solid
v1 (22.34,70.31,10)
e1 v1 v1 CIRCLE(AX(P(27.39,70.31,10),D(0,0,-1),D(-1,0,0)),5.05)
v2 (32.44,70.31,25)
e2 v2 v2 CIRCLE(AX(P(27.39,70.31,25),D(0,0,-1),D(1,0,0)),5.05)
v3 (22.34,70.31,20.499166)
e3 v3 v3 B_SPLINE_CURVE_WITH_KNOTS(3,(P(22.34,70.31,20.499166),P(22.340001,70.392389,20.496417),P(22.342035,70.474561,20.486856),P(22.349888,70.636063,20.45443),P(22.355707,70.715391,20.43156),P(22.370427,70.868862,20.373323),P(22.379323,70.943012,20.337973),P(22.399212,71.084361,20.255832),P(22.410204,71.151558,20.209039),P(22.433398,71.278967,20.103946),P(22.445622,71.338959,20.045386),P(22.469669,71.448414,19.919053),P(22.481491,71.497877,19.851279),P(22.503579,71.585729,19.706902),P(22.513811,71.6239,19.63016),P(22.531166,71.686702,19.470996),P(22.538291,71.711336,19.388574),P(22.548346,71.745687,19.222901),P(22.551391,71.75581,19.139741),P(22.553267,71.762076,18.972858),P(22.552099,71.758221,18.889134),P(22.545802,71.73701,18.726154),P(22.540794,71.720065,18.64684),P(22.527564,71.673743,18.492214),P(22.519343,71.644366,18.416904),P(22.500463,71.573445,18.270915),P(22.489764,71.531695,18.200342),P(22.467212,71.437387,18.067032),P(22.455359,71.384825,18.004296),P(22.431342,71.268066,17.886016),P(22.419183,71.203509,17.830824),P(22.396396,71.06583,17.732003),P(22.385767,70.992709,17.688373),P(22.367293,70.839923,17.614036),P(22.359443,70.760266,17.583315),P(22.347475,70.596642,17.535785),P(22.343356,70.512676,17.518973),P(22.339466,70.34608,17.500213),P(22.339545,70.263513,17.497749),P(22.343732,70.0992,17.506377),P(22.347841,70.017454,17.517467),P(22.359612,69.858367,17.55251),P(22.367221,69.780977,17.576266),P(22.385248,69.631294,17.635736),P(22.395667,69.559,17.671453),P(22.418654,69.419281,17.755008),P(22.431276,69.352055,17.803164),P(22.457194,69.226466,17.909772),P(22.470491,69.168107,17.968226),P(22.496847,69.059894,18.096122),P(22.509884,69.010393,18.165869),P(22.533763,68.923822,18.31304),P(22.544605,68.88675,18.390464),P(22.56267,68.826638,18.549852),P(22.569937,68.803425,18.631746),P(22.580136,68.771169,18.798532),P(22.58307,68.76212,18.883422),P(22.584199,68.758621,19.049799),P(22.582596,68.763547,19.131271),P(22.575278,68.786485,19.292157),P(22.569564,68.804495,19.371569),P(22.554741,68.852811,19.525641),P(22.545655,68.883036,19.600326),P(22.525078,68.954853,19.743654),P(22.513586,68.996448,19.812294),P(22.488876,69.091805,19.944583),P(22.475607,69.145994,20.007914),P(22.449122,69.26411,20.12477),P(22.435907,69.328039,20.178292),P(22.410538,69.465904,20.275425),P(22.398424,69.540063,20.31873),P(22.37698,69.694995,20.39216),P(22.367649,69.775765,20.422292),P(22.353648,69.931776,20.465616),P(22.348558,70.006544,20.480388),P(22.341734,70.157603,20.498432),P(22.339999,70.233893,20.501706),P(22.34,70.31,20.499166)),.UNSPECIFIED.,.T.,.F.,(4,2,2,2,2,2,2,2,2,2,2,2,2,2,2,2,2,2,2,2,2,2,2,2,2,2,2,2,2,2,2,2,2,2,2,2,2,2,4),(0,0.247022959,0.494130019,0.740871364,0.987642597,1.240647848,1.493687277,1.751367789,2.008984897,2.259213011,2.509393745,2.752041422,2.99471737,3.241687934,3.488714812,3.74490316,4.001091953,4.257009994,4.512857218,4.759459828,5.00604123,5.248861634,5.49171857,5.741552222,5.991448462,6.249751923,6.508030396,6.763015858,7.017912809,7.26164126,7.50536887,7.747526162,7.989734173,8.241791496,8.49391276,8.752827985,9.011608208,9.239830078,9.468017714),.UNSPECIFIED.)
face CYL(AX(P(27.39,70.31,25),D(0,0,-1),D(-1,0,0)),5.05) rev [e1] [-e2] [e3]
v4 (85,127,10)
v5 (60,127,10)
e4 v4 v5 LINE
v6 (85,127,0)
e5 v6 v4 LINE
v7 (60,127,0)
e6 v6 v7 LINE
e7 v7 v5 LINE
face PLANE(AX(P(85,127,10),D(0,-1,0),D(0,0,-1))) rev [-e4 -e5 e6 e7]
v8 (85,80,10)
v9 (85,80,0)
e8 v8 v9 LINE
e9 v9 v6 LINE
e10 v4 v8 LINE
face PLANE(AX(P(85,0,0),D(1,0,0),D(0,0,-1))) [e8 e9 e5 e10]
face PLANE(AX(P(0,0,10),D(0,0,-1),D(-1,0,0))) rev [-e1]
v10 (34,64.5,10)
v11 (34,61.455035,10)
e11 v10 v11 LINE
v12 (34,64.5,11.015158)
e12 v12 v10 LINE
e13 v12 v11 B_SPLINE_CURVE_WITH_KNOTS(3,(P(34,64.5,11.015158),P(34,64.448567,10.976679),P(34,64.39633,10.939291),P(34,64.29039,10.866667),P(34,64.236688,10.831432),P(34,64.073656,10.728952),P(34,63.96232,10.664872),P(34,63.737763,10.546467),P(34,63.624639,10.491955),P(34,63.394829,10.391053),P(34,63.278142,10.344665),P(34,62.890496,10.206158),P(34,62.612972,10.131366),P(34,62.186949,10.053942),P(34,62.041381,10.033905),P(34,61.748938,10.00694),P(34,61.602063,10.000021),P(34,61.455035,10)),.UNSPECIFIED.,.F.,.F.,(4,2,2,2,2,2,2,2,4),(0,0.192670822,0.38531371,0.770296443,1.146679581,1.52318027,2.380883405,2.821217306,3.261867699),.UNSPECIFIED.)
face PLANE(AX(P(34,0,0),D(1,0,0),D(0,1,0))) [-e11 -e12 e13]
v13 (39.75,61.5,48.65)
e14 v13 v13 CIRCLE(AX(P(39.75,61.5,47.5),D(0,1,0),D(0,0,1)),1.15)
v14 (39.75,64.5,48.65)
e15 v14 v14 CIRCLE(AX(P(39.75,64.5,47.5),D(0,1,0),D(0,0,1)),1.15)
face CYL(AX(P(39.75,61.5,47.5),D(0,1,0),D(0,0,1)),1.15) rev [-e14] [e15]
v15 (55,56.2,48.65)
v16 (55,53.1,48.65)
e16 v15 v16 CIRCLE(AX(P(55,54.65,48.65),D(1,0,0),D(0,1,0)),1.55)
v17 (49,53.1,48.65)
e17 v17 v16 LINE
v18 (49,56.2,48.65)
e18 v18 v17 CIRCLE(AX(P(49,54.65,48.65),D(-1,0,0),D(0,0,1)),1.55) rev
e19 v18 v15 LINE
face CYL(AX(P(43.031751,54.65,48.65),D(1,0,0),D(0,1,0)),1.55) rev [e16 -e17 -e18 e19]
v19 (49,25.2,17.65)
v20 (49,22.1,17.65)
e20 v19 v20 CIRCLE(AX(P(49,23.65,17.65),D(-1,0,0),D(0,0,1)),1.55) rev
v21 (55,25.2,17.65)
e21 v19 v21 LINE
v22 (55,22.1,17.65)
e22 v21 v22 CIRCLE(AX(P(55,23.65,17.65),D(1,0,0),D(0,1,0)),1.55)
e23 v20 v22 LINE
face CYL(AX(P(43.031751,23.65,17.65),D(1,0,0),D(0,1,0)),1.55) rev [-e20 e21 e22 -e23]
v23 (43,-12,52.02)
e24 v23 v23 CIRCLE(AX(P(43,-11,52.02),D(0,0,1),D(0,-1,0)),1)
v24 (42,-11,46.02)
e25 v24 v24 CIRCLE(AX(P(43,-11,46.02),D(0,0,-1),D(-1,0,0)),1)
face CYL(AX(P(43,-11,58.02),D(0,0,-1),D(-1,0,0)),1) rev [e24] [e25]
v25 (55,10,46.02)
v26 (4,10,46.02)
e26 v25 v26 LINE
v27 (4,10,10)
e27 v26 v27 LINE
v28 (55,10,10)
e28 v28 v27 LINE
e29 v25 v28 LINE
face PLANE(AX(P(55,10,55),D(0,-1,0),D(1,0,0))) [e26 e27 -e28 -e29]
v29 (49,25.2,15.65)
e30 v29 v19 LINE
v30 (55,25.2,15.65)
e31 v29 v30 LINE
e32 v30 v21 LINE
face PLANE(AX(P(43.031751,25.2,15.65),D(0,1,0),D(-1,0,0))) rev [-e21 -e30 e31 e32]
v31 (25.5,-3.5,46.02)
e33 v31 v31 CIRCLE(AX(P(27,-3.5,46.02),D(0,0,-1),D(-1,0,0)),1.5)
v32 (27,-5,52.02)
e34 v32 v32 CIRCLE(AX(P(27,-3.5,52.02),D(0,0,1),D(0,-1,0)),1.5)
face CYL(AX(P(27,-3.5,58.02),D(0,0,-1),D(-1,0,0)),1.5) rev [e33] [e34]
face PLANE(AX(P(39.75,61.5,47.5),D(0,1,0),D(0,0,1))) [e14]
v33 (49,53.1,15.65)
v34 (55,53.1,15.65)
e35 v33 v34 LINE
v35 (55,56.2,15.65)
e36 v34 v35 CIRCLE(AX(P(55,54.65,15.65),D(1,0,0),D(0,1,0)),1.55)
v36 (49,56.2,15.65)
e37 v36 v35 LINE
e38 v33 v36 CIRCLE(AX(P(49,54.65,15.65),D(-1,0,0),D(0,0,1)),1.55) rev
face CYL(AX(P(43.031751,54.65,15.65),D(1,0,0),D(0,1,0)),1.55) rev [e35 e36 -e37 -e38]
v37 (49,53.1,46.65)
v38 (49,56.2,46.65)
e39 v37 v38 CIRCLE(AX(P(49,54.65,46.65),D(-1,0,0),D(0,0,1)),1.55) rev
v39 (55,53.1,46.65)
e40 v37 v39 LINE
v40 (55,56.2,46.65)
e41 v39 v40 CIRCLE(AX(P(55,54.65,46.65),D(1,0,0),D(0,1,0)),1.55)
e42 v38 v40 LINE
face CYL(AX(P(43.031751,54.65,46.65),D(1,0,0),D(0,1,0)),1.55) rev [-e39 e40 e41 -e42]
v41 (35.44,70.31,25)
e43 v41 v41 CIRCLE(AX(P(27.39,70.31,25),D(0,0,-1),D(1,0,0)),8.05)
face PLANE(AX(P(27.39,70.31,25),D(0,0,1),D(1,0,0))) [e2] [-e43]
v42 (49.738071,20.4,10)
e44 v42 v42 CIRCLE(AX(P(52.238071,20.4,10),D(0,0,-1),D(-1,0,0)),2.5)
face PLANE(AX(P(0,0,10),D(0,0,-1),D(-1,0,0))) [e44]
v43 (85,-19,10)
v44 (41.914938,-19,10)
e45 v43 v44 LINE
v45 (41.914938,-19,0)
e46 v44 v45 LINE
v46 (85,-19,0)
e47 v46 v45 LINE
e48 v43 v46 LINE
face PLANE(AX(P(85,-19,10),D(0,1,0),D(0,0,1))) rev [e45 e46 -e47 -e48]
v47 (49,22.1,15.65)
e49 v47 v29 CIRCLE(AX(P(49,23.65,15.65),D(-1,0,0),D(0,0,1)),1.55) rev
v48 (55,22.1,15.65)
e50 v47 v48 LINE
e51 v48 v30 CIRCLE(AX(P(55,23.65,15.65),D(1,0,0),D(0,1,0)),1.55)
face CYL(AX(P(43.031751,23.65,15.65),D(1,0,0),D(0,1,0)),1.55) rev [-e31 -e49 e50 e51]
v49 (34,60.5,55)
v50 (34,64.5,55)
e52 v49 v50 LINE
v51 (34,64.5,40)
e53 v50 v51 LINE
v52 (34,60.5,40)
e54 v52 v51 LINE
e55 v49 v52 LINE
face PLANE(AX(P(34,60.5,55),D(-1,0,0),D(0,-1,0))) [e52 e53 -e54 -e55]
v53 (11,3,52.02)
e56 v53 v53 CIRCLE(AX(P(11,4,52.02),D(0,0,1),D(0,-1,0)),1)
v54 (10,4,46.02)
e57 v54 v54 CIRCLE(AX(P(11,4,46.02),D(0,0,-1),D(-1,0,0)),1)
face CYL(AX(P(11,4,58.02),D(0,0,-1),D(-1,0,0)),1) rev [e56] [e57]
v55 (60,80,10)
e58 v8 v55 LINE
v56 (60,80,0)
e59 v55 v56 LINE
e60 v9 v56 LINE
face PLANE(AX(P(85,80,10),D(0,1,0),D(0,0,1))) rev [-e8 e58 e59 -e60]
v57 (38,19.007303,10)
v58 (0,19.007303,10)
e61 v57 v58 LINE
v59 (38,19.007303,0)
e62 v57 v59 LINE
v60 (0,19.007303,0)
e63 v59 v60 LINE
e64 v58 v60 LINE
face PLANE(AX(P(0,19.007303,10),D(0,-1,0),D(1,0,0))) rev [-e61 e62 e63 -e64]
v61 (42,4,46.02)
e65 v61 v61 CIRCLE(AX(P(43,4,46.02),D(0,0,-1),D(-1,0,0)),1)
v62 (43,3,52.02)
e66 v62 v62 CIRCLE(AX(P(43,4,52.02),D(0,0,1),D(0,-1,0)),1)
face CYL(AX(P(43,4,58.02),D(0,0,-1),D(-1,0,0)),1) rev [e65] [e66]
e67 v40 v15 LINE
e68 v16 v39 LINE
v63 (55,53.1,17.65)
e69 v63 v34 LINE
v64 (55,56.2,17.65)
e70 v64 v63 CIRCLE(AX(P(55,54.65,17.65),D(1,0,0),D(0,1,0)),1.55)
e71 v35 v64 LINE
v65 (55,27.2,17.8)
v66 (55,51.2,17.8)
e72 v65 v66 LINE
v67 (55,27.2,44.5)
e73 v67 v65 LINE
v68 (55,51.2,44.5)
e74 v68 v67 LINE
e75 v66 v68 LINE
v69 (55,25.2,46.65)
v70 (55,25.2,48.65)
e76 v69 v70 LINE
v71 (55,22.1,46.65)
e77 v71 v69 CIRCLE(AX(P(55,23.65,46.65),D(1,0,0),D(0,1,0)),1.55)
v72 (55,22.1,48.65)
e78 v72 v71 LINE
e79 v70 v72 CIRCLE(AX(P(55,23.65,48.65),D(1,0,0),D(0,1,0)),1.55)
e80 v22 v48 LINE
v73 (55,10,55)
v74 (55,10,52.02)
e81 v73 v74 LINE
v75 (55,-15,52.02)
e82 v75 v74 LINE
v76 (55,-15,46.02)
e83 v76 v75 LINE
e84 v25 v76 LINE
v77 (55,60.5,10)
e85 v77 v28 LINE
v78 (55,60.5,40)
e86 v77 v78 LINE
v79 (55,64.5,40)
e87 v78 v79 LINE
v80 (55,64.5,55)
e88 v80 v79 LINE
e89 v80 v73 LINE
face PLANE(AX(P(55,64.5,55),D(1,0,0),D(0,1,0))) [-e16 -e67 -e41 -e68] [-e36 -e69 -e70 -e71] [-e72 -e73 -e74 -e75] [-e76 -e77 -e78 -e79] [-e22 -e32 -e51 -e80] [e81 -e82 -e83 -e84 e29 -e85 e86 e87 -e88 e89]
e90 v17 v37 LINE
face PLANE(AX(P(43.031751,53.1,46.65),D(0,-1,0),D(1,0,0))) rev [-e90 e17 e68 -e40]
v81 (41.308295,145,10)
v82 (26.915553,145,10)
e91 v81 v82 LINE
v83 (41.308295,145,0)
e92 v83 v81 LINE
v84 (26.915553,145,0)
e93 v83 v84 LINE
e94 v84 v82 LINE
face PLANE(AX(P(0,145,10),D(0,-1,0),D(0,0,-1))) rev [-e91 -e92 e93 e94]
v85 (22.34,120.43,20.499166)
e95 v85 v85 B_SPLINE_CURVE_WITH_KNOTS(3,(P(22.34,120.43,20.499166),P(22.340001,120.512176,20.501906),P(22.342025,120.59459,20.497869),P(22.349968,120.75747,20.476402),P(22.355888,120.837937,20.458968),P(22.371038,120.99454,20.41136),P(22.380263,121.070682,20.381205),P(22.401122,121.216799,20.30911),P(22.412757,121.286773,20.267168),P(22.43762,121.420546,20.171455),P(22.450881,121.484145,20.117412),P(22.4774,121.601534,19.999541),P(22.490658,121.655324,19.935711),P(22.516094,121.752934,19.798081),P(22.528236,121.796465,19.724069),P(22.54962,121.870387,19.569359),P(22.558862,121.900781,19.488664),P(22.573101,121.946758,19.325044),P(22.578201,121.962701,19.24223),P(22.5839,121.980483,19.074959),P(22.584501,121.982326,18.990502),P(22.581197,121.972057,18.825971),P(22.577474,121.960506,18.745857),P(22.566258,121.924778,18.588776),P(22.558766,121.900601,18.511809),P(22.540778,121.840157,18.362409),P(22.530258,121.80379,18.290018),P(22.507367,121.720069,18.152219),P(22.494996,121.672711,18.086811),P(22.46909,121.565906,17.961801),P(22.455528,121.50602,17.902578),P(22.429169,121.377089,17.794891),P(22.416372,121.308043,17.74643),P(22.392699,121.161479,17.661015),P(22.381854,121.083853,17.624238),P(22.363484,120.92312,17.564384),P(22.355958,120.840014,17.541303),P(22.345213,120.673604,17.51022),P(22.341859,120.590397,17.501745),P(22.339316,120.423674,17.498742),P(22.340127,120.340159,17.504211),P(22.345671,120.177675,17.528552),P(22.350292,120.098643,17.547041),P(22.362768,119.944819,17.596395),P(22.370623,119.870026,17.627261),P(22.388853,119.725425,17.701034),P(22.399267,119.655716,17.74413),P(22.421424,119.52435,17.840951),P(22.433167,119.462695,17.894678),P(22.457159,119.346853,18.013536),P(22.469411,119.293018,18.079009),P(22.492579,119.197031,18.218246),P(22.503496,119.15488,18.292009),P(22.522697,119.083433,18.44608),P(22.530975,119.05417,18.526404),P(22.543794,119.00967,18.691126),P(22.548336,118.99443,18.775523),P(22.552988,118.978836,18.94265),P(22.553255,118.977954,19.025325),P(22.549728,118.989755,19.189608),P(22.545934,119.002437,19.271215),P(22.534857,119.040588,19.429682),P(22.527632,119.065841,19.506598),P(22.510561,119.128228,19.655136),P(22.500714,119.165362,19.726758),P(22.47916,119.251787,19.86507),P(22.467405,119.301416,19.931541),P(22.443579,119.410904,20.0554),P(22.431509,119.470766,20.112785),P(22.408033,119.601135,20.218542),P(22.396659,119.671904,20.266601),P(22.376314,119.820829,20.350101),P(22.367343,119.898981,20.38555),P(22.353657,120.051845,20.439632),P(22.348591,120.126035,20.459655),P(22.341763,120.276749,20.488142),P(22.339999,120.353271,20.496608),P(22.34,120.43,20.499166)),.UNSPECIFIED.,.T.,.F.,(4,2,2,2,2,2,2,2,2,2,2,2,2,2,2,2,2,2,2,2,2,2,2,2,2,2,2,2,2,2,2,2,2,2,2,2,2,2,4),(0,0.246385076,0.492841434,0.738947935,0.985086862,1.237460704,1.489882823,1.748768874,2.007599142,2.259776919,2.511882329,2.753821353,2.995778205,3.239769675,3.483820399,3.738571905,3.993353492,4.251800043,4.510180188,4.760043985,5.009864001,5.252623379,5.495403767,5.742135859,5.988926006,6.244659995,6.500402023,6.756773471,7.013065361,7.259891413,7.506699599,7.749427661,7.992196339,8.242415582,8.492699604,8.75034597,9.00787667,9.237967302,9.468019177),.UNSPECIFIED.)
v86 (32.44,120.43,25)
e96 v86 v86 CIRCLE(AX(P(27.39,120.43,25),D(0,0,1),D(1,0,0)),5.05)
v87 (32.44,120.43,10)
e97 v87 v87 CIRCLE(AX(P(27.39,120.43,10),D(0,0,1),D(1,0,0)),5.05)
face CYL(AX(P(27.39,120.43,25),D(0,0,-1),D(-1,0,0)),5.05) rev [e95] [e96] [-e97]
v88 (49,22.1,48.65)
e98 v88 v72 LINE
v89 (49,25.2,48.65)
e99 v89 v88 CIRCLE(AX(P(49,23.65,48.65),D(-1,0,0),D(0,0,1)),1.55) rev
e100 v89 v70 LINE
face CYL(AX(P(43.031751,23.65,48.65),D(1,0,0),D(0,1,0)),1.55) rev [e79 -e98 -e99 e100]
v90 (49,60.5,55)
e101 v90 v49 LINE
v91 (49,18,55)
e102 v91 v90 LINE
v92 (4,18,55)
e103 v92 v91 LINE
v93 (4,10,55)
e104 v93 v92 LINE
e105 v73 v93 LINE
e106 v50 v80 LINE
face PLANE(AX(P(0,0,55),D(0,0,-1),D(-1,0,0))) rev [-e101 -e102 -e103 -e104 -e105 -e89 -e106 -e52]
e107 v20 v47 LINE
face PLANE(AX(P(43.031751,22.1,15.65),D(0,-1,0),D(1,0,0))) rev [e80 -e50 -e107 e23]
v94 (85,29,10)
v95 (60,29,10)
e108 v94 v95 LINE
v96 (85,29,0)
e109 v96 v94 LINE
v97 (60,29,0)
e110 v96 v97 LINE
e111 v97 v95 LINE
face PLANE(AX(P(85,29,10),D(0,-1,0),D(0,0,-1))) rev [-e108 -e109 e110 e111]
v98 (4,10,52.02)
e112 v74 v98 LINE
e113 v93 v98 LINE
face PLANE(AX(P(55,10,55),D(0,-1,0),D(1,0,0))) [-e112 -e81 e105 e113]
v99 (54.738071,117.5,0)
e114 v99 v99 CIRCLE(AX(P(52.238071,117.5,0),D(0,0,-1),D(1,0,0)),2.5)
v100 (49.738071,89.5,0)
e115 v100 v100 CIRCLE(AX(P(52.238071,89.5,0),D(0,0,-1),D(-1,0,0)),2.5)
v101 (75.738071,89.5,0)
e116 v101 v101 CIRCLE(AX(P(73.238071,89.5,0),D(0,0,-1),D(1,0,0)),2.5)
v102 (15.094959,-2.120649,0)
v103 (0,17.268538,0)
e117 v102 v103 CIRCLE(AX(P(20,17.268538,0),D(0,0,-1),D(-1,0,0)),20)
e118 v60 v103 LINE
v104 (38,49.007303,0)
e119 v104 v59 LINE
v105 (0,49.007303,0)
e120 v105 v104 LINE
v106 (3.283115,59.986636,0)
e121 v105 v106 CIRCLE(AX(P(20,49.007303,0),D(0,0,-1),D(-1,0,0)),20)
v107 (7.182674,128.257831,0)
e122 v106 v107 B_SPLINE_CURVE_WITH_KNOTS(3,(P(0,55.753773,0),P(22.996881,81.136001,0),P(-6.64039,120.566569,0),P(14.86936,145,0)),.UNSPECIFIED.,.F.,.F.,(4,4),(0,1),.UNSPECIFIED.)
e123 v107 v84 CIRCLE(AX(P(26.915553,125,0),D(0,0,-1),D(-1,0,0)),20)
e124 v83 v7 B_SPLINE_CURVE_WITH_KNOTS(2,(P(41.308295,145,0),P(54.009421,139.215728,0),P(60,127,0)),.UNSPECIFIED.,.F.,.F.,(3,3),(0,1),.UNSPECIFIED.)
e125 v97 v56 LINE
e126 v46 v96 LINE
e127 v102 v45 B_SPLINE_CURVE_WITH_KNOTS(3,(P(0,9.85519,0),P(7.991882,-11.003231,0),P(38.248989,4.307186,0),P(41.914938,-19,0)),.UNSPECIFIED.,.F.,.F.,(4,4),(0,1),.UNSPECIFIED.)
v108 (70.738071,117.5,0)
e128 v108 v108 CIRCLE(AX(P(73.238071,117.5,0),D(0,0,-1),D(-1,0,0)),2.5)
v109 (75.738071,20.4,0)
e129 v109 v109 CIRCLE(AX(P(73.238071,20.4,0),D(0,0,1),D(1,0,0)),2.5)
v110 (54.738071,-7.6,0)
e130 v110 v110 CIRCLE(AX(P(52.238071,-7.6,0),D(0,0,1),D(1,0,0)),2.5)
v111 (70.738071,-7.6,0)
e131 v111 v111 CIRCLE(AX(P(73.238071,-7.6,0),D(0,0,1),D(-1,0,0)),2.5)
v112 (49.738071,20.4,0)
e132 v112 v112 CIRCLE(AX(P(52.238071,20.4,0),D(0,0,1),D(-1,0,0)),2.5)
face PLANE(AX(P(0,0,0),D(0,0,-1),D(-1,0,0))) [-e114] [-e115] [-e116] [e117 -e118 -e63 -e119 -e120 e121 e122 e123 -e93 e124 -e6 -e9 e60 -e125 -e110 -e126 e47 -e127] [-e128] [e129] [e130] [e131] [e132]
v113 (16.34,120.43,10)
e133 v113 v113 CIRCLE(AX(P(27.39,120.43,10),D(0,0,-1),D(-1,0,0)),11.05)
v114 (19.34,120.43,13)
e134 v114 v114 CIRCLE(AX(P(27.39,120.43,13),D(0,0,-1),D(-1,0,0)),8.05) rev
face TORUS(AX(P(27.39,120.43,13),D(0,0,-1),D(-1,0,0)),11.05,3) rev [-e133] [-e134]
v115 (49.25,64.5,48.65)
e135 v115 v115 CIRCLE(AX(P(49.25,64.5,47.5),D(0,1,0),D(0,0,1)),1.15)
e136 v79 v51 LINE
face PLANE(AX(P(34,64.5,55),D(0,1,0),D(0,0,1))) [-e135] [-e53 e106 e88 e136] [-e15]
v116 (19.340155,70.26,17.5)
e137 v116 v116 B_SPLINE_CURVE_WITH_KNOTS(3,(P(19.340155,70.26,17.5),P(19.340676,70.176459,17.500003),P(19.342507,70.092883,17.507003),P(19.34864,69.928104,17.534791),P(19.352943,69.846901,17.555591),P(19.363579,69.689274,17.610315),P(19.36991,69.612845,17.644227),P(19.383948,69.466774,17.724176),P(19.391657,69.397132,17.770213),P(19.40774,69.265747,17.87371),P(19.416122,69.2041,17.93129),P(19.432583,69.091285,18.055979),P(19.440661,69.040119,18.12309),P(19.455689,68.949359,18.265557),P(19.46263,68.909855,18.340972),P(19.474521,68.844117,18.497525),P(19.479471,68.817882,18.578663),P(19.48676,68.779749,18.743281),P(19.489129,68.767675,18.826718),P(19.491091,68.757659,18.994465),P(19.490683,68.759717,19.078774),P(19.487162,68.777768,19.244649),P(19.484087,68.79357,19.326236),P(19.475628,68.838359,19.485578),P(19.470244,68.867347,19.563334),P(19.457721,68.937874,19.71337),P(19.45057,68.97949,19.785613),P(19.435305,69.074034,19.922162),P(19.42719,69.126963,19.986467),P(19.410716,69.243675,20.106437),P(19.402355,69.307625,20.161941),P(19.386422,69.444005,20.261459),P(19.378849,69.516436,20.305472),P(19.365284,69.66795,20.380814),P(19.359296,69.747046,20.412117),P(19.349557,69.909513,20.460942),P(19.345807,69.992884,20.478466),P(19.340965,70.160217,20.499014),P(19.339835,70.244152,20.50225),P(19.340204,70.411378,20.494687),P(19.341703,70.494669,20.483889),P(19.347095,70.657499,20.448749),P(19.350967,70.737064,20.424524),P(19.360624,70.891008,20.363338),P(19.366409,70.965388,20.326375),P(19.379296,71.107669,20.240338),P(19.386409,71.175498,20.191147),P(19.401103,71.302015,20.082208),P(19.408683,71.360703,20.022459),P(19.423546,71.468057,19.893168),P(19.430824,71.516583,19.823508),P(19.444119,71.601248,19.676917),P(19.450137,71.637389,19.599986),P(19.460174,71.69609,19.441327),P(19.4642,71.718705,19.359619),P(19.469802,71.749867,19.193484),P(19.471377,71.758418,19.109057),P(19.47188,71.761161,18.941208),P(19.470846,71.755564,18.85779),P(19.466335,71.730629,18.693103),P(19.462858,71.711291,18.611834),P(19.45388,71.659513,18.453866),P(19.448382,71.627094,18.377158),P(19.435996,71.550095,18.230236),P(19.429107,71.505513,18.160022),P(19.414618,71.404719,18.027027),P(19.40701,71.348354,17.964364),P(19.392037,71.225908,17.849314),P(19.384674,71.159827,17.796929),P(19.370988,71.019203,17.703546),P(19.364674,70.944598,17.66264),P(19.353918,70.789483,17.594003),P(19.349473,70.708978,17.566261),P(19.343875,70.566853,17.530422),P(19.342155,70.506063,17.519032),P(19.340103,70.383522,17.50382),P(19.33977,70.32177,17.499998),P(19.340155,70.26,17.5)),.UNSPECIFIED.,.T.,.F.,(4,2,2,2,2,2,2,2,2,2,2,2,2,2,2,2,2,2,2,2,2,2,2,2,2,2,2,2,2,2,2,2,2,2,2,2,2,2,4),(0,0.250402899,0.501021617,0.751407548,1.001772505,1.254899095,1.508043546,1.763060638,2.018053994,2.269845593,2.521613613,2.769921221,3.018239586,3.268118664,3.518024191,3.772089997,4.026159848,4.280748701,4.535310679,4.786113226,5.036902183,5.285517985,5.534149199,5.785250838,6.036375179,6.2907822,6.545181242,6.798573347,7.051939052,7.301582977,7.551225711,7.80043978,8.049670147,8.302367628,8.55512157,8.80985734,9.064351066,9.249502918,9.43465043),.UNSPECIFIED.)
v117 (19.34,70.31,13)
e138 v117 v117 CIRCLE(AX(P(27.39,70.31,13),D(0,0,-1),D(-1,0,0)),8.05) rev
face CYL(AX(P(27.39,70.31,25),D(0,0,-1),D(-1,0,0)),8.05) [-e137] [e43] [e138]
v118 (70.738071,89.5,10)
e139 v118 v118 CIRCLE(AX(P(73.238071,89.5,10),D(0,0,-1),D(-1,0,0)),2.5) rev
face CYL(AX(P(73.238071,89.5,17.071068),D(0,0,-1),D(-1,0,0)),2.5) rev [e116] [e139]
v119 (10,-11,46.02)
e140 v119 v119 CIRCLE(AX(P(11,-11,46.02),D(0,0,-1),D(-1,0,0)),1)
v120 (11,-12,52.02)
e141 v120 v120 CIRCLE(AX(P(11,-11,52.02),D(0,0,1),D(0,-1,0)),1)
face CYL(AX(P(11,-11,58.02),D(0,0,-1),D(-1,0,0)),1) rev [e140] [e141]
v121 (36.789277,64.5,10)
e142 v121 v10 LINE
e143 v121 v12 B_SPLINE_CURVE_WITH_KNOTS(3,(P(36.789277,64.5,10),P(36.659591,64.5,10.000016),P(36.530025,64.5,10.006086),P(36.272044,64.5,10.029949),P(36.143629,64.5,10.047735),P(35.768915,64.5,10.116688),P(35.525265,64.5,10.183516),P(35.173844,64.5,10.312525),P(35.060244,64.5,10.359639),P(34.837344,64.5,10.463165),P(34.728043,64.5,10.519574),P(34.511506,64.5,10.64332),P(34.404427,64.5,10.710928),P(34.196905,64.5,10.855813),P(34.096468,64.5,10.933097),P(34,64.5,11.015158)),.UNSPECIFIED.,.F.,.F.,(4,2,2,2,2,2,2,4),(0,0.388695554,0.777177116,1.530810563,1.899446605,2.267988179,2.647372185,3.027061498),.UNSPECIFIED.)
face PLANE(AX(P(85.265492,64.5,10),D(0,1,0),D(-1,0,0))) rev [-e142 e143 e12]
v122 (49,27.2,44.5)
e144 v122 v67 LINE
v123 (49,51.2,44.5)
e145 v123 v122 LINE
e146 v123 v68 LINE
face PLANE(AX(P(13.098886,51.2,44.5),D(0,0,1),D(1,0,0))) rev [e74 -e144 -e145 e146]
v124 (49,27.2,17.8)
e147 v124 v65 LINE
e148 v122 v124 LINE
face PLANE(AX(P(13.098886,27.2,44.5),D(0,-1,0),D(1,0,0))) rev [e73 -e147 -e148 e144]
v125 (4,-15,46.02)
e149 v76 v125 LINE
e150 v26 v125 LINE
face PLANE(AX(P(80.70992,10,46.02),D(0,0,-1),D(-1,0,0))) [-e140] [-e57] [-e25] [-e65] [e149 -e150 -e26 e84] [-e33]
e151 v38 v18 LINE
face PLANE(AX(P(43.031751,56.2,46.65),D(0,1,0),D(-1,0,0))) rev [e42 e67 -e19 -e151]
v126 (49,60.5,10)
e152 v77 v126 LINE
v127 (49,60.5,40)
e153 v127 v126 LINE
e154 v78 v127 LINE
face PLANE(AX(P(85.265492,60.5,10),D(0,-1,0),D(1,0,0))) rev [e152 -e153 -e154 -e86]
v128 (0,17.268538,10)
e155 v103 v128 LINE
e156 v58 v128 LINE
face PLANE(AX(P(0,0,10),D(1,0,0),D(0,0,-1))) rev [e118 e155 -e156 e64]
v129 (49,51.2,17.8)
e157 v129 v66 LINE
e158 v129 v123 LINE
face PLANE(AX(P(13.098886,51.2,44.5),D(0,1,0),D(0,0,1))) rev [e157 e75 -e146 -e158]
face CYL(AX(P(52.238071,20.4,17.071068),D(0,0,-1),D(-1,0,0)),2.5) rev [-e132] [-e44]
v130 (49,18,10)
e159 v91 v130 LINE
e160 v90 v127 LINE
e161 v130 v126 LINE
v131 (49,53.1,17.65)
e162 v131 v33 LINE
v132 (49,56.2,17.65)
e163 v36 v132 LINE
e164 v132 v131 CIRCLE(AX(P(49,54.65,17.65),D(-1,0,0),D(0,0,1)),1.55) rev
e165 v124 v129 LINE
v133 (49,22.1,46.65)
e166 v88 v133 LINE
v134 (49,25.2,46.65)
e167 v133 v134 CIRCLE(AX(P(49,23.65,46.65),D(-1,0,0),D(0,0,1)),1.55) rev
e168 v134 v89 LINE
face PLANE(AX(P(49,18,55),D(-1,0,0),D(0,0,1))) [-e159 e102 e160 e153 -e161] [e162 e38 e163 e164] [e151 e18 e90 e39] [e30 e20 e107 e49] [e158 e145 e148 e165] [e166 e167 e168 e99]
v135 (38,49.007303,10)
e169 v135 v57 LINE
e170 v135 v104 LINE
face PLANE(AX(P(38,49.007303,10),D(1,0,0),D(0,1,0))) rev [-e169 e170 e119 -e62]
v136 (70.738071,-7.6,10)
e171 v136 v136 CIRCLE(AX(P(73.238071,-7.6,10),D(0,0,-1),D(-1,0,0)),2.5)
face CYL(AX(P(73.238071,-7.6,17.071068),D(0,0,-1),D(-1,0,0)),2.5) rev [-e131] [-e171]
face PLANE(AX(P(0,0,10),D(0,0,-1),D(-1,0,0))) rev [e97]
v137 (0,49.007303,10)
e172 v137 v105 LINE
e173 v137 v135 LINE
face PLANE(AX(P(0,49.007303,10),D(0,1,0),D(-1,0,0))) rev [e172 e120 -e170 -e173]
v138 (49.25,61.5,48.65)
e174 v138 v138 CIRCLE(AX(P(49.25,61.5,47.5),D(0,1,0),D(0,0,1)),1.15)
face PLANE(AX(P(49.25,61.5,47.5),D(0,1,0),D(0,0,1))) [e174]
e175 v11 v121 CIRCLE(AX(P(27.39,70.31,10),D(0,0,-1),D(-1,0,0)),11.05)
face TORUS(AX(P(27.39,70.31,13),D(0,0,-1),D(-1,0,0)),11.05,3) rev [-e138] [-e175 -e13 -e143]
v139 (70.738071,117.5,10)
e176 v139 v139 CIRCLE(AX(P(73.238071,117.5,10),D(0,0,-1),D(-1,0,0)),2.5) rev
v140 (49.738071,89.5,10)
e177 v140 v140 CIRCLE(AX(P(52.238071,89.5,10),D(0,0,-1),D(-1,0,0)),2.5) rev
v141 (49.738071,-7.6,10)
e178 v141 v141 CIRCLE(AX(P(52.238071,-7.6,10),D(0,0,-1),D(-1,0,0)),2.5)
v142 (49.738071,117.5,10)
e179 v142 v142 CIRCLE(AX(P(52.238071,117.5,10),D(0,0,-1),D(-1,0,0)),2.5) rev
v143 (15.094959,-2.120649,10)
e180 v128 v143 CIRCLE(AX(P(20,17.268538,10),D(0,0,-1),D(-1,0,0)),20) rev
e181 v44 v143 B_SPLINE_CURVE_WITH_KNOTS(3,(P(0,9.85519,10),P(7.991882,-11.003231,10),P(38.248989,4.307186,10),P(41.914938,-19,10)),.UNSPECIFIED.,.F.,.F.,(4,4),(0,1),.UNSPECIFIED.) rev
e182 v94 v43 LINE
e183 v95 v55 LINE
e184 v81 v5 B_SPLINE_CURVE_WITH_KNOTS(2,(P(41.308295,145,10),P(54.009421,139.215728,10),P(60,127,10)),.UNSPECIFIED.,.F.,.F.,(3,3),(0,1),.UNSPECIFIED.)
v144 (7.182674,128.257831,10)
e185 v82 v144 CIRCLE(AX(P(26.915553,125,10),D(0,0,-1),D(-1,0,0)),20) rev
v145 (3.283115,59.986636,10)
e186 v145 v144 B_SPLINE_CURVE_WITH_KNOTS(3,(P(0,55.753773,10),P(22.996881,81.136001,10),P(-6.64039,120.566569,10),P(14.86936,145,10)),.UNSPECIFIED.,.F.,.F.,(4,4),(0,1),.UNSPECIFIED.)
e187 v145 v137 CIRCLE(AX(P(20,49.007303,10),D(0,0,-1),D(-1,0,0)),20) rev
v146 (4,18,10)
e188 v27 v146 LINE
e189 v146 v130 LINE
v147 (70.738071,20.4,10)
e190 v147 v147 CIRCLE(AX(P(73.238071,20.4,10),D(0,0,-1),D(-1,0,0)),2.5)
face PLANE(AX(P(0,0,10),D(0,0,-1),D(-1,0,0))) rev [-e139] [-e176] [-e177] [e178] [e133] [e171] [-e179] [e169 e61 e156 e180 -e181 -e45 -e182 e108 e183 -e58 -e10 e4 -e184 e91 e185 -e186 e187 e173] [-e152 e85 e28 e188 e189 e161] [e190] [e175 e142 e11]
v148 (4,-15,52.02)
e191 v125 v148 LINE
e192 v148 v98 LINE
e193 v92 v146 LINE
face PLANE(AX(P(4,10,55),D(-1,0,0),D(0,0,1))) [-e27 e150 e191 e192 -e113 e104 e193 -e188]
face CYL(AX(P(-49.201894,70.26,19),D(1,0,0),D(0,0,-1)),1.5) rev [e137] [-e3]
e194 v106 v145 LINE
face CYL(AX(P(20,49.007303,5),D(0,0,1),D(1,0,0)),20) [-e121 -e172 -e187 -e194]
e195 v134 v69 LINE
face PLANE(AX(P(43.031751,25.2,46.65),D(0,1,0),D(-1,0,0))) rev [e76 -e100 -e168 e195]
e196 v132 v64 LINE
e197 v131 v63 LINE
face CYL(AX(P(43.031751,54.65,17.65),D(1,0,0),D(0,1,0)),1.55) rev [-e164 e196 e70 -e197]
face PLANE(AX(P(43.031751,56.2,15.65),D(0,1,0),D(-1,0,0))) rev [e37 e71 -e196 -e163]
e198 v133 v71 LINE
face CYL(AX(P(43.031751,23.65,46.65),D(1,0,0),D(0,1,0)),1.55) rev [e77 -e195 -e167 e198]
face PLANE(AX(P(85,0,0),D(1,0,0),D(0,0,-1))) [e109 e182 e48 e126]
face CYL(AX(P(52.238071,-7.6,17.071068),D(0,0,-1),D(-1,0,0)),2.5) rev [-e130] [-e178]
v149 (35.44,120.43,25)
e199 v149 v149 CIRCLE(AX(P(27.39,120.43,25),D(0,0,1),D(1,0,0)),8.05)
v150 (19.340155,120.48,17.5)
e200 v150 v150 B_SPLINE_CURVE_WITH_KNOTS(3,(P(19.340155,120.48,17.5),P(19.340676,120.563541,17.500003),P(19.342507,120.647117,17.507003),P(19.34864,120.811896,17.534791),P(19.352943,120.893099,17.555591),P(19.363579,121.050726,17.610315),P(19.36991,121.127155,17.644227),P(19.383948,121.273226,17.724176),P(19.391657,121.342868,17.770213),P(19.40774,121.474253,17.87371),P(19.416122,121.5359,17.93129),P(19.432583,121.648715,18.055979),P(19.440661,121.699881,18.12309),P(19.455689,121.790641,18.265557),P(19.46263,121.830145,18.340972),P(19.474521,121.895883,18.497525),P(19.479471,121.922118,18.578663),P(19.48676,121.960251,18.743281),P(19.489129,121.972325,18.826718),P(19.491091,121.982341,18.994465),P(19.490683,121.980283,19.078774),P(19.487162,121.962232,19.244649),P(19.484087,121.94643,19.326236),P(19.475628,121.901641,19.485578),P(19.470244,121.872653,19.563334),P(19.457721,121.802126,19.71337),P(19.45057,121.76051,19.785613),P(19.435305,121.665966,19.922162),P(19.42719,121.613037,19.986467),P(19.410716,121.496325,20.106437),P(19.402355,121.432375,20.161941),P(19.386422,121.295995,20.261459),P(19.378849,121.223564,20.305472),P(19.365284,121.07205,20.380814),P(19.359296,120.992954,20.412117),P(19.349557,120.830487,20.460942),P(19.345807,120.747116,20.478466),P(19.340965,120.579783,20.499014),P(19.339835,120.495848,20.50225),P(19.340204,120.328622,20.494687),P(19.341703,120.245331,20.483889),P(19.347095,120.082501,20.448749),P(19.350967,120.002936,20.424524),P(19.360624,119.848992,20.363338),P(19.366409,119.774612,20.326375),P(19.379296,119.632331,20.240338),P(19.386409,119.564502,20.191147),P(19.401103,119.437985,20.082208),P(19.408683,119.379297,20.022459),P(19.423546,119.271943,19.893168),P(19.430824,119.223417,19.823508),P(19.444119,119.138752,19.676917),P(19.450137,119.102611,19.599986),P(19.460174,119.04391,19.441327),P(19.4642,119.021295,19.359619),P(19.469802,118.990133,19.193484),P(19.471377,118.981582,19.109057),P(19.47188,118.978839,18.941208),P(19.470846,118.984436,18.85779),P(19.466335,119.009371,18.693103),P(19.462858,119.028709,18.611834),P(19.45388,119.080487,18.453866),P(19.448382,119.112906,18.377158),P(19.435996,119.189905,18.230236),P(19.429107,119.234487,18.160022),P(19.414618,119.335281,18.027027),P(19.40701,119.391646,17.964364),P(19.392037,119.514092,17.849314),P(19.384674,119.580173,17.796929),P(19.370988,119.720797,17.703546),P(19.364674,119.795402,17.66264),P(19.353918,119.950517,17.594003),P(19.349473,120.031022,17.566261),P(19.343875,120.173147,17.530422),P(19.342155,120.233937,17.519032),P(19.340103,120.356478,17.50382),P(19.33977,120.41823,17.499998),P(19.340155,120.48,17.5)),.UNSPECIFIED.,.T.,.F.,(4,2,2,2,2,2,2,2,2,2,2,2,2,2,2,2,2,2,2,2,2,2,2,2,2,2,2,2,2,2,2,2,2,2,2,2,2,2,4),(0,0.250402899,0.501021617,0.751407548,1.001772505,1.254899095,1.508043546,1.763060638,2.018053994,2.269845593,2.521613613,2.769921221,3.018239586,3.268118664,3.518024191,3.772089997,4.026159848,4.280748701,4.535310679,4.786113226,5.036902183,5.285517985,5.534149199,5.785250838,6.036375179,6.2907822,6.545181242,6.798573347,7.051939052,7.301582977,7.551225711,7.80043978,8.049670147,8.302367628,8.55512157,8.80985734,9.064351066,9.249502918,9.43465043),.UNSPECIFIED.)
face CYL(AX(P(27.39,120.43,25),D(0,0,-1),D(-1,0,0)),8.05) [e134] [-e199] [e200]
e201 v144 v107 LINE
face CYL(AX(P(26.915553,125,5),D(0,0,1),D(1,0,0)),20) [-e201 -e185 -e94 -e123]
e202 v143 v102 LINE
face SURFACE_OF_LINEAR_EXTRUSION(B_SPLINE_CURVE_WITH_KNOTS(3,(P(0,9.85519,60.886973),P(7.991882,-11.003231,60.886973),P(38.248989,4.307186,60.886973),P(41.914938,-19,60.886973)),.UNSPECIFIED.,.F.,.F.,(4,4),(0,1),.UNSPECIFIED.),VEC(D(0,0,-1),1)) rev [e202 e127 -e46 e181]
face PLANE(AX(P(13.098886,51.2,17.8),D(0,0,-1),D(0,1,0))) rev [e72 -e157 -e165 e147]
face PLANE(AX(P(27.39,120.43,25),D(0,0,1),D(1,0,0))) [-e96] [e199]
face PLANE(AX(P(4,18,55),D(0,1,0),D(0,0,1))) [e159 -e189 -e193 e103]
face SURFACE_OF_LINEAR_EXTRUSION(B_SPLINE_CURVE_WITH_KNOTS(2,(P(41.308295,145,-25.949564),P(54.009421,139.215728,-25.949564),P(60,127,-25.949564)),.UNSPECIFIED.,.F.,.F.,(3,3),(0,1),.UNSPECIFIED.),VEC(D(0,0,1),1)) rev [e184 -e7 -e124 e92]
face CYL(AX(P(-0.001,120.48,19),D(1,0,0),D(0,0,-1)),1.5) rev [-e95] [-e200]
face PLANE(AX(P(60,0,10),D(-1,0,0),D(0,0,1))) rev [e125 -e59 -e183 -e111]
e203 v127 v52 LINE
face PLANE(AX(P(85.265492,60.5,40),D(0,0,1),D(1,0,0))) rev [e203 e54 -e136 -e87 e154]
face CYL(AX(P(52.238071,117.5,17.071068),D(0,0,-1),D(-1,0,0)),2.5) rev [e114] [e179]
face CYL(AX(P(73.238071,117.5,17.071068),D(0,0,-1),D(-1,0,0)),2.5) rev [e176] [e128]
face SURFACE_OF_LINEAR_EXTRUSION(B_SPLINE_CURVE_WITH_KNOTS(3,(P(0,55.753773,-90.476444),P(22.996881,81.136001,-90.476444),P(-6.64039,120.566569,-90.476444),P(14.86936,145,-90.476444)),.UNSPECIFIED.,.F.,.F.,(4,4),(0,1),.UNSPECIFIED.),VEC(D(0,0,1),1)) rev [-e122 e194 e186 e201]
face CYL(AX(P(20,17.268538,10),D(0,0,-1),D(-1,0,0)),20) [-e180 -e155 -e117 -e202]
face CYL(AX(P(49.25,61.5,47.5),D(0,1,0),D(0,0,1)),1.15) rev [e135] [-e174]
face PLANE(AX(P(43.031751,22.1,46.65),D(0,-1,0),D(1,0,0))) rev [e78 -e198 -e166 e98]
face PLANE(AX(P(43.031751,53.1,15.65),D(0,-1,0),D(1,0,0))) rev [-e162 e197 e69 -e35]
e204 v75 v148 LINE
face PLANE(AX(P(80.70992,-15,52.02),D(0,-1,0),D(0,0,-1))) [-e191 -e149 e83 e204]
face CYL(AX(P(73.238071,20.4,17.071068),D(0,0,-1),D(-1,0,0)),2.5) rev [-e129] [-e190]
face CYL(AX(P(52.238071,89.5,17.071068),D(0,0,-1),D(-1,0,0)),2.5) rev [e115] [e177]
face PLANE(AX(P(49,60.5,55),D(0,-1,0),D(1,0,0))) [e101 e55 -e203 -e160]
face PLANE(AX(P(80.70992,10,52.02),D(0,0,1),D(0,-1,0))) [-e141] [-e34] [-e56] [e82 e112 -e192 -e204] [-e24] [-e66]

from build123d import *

# Parameters (mm, degrees)
SKETCH1_W               = 60
SKETCH1_H               = 145
BOSS_EXTRUDE1_DEPTH     = 10
BOSS_EXTRUDE2_DEPTH     = 45
SKETCH6_W               = 26.7
SKETCH6_H               = 24
CUT_EXTRUDE2_DEPTH      = 6
SKETCH8_R               = 1.15
CUT_EXTRUDE3_DEPTH      = 3
SKETCH9_W               = 60
SKETCH9_H               = 10
BOSS_EXTRUDE4_DEPTH     = 35
SKETCH12_W              = 6
SKETCH12_H              = 25
BOSS_EXTRUDE7_DEPTH     = 51
SKETCH13_R              = 8.05
SKETCH13_R_2            = 5.05
BOSS_EXTRUDE8_DEPTH     = 15
FILLET1_R               = 3
CUT_EXTRUDE4_REACH      = 160.348
CUT_EXTRUDE4_END_RADIUS = 8.05
SKETCH15_R              = 1.5
MIRROR1_START           = 9
MIRROR1_OUTLINE_R       = 8.05
MIRROR1_OUTLINE_R_2     = 5.05
MIRROR1_DEPTH           = 8.499999899
MIRROR1_START_2         = 20.499999166
MIRROR1_2_OUTLINE_R     = 8.05
MIRROR1_2_OUTLINE_R_2   = 5.05
MIRROR1_2_DEPTH         = 4.500000834
MIRROR1_START_3         = 17.499999899
MIRROR1_3_OUTLINE_R     = 8.05
MIRROR1_3_OUTLINE_R_2   = 5.05
MIRROR1_3_DEPTH         = 2.999999267
MIRROR1_START_4         = 18
MIRROR1_5_OUTLINE_R     = 1.5
MIRROR1_5_DEPTH         = 4.583753541
SKETCH17_W              = 10
SKETCH17_H              = 47
BOSS_EXTRUDE9_DEPTH     = 25
SKETCH18_W              = 10
SKETCH18_H              = 48
BOSS_EXTRUDE10_DEPTH    = 25
SKETCH19_R              = 2.5
CUT_EXTRUDE5_DEPTH      = 10
SKETCH20_W              = 60
SKETCH20_H              = 16
CUT_EXTRUDE6_DEPTH      = 10
CUT_EXTRUDE7_DEPTH      = 10
CUT_EXTRUDE8_DEPTH      = 10
FILLET2_R               = 20
CUT_EXTRUDE9_DEPTH      = 10
CUT_EXTRUDE10_DEPTH     = 101.361917618
CUT_EXTRUDE11_START     = -21
SKETCH26_W              = 30
SKETCH26_H              = 4
CUT_EXTRUDE11_DEPTH     = 21
SKETCH28_W              = 38
SKETCH28_H              = 30
CUT_EXTRUDE12_DEPTH     = 10
SKETCH29_R              = 1
SKETCH29_R_2            = 1.5
CUT_EXTRUDE13_DEPTH     = 12


with BuildPart() as part:
    # Sketch1 → Boss-Extrude1 (new body)
    with BuildSketch(Plane.XY):
        with Locations((30, 72.5)):
            Rectangle(SKETCH1_W, SKETCH1_H)
    extrude(amount=BOSS_EXTRUDE1_DEPTH)

    # Sketch2 → Boss-Extrude2 (add)
    with BuildSketch(Plane.XY.offset(10)):
        Polygon((4, 18), (49, 18), (49, 60.5), (34, 60.5), (34, 64.5), (55, 64.5), (55, 10), (4, 10), align=None)
    extrude(amount=BOSS_EXTRUDE2_DEPTH)

    # Sketch6 → Cut-Extrude2 (cut)
    with BuildSketch(Plane(origin=(55, 0, 0), x_dir=(0, 0, -1), z_dir=(1, 0, 0))):
        with Locations((-31.15, 39.2)):
            Rectangle(SKETCH6_W, SKETCH6_H)
    extrude(amount=-CUT_EXTRUDE2_DEPTH, mode=Mode.SUBTRACT)

    # Sketch8 → Cut-Extrude3 (cut)
    with BuildSketch(Plane(origin=(0, 64.5, 0), x_dir=(1, 0, 0), z_dir=(0, 1, 0))):
        with Locations(Location((49.25, -47.5, 0), (0, 0, 270))):
            Circle(SKETCH8_R)
        with Locations(Location((39.75, -47.5, 0), (0, 0, 270))):
            Circle(SKETCH8_R)
    extrude(amount=-CUT_EXTRUDE3_DEPTH, mode=Mode.SUBTRACT)

    # Sketch9 → Boss-Extrude4 (add)
    with BuildSketch(Plane.XZ):
        with Locations((30, 5)):
            Rectangle(SKETCH9_W, SKETCH9_H)
    extrude(amount=BOSS_EXTRUDE4_DEPTH)

    # Sketch12 → Boss-Extrude7 (add)
    with BuildSketch(Plane.ZY.offset(-4)):
        with Locations((49.02, -2.5)):
            Rectangle(SKETCH12_W, SKETCH12_H)
    extrude(amount=-BOSS_EXTRUDE7_DEPTH)

    # Sketch13 → Boss-Extrude8 (add)
    with BuildSketch(Plane.XY.offset(10)):
        with Locations(Location((27.39, 120.43, 0), (0, 0, 180))):
            Circle(SKETCH13_R)
        with Locations((27.39, 120.43)):
            Circle(SKETCH13_R_2, mode=Mode.SUBTRACT)
    extrude(amount=BOSS_EXTRUDE8_DEPTH)

    # Fillet1
    fillet1_edges = [part.edges().sort_by_distance(p)[0] for p in [
        (35.44, 120.43, 10),
    ]]
    fillet(fillet1_edges, radius=FILLET1_R)

    # Cut-Extrude4: up to this cylinder (the profile starts inside it)
    cut_extrude4_end = Plane(origin=(27.39, 120.43, 19), z_dir=(0, 0, -1)) * Cylinder(CUT_EXTRUDE4_END_RADIUS, 337.796, mode=Mode.PRIVATE)
    # Sketch15 → Cut-Extrude4 (cut, up to the surface)
    with BuildSketch(Plane.ZY.offset(-32), mode=Mode.PRIVATE) as cut_extrude4_sk1:
        with Locations(Location((19, 120.48, 0), (0, 0, 180))):
            Circle(SKETCH15_R)
    cut_extrude4_tool1 = extrude(cut_extrude4_sk1.sketch, amount=CUT_EXTRUDE4_REACH, mode=Mode.PRIVATE) & cut_extrude4_end
    add(cut_extrude4_tool1.solids().sort_by_distance((32, 120.48, 19))[0], mode=Mode.SUBTRACT)

    # Mirror1: read off the stored shape, not the designer's step
    # Mirror1 outline → Mirror1 (add)
    with BuildSketch(Plane.XY.offset(MIRROR1_START)):
        with Locations((27.39, 70.31)):
            Circle(MIRROR1_OUTLINE_R)
        with Locations((27.39, 70.31)):
            Circle(MIRROR1_OUTLINE_R_2, mode=Mode.SUBTRACT)
    extrude(amount=MIRROR1_DEPTH)



with BuildPart() as body_2:
    # Mirror1 2 outline → Mirror1 2 (new body)
    with BuildSketch(Plane.XY.offset(MIRROR1_START_2)):
        with Locations((27.39, 70.31)):
            Circle(MIRROR1_2_OUTLINE_R)
        with Locations((27.39, 70.31)):
            Circle(MIRROR1_2_OUTLINE_R_2, mode=Mode.SUBTRACT)
    extrude(amount=MIRROR1_2_DEPTH)


with BuildPart() as part_1:
    add(part.part)

    add(body_2.part)  # Mirror1 3 merges body 2
    # Mirror1 3 outline → Mirror1 3 (add)
    with BuildSketch(Plane.XY.offset(MIRROR1_START_3)):
        with Locations((27.39, 70.31)):
            Circle(MIRROR1_3_OUTLINE_R)
        with Locations((27.39, 70.31)):
            Circle(MIRROR1_3_OUTLINE_R_2, mode=Mode.SUBTRACT)
    extrude(amount=MIRROR1_3_DEPTH)

    # Mirror1 4 outline → Mirror1 4 (revolve)
    with BuildSketch(Plane(origin=(27.39, 70.31, 0), x_dir=(1, 0, 0), z_dir=(0, -1, 0))):
        with BuildLine():
            Line((8.05, 10), (11.05, 10))
            ThreePointArc((11.05, 10), (8.928679656, 10.878679656), (8.05, 13))
            Line((8.05, 13), (8.05, 10))
        make_face()
    revolve(axis=Axis((27.39, 70.31, 0), (0, 0, 1)))

    # Mirror1 5 outline → Mirror1 5 (cut)
    with BuildSketch(Plane.YZ.offset(MIRROR1_START_4)):
        with Locations((70.26, 19)):
            Circle(MIRROR1_5_OUTLINE_R)
    extrude(amount=MIRROR1_5_DEPTH, mode=Mode.SUBTRACT)

    # Sketch17 → Boss-Extrude9 (add)
    with BuildSketch(Plane(origin=(60, 0, 0), x_dir=(0, 0, -1), z_dir=(1, 0, 0))):
        with Locations((-5, 103.5)):
            Rectangle(SKETCH17_W, SKETCH17_H)
    extrude(amount=BOSS_EXTRUDE9_DEPTH)

    # Sketch18 → Boss-Extrude10 (add)
    with BuildSketch(Plane(origin=(60, 0, 0), x_dir=(0, 0, -1), z_dir=(1, 0, 0))):
        with Locations((-5, 5)):
            Rectangle(SKETCH18_W, SKETCH18_H)
    extrude(amount=BOSS_EXTRUDE10_DEPTH)

    # Sketch19 → Cut-Extrude5 (cut)
    with BuildSketch(Plane(origin=(0, 0, 0), x_dir=(-1, 0, 0), z_dir=(0, 0, -1))):
        with Locations((-73.238071341, 117.5)):
            Circle(SKETCH19_R)
        with Locations((-52.238071341, 117.5)):
            Circle(SKETCH19_R)
        with Locations((-52.238071341, 89.5)):
            Circle(SKETCH19_R)
        with Locations((-73.238071341, 89.5)):
            Circle(SKETCH19_R)
    cut_extrude5 = extrude(amount=-CUT_EXTRUDE5_DEPTH, mode=Mode.SUBTRACT)

    # Mirror2: Cut-Extrude5 across plane
    add(cut_extrude5.mirror(Plane.ZX.offset(54.95)), mode=Mode.SUBTRACT)

    # Sketch20 → Cut-Extrude6 (cut)
    with BuildSketch(Plane(origin=(0, 0, 0), x_dir=(-1, 0, 0), z_dir=(0, 0, -1))):
        with Locations((-30, -27)):
            Rectangle(SKETCH20_W, SKETCH20_H)
    extrude(amount=-CUT_EXTRUDE6_DEPTH, mode=Mode.SUBTRACT)

    # Sketch21 → Cut-Extrude7 (cut)
    with BuildSketch(Plane(origin=(0, 0, 0), x_dir=(-1, 0, 0), z_dir=(0, 0, -1))):
        with BuildLine():
            Line((-41.91493827, -19), (0, -19))
            Line((0, -19), (0, 9.855190418))
            add(Edge.make_bspline(
                [(0, 9.855190418), (-7.991882229, -11.003231013), (-38.248988904, 4.307186348), (-41.91493827, -19)],
                knots=[0, 0, 0, 0, 1, 1, 1, 1], degree=3))
        make_face()
    extrude(amount=-CUT_EXTRUDE7_DEPTH, mode=Mode.SUBTRACT)

    # Sketch22 → Cut-Extrude8 (cut)
    with BuildSketch(Plane.XY.offset(10)):
        with BuildLine():
            Line((14.869359674, 145), (0, 145))
            Line((0, 145), (0, 55.753772628))
            add(Edge.make_bspline(
                [(0, 55.753772628), (22.996880837, 81.13600087), (-6.640389726, 120.566568951), (14.869359674, 145)],
                knots=[0, 0, 0, 0, 1, 1, 1, 1], degree=3))
        make_face()
    extrude(amount=-CUT_EXTRUDE8_DEPTH, mode=Mode.SUBTRACT)

    # Fillet2
    fillet2_edges = [part_1.edges().sort_by_distance(p)[0] for p in [
        (0, 9.855190418, 5),
        (0, 55.753772628, 5),
        (14.869359674, 145, 5),
    ]]
    fillet(fillet2_edges, radius=FILLET2_R)

    # Sketch23 → Cut-Extrude9 (cut)
    with BuildSketch(Plane.XY.offset(10)):
        with BuildLine():
            Line((41.308294674, 145), (60, 145))
            Line((60, 145), (60, 127))
            add(Edge.make_bspline(
                [(60, 127), (54.009421291, 139.215727594), (41.308294674, 145)],
                knots=[0, 0, 0, 1, 1, 1], degree=2))
        make_face()
    extrude(amount=-CUT_EXTRUDE9_DEPTH, mode=Mode.SUBTRACT)

    # Sketch24 → Cut-Extrude10 (cut)
    with BuildSketch(Plane(origin=(55, 0, 0), x_dir=(0, 0, -1), z_dir=(1, 0, 0))):
        with BuildLine():
            Line((-46.65, 53.1), (-48.65, 53.1))
            ThreePointArc((-48.65, 53.1), (-50.2, 54.65), (-48.65, 56.2))
            Line((-48.65, 56.2), (-46.65, 56.2))
            ThreePointArc((-46.65, 56.2), (-45.1, 54.65), (-46.65, 53.1))
        make_face()
        with BuildLine():
            Line((-15.65, 53.1), (-17.65, 53.1))
            ThreePointArc((-17.65, 53.1), (-19.2, 54.65), (-17.65, 56.2))
            Line((-17.65, 56.2), (-15.65, 56.2))
            ThreePointArc((-15.65, 56.2), (-14.1, 54.65), (-15.65, 53.1))
        make_face()
        with BuildLine():
            Line((-15.65, 22.1), (-17.65, 22.1))
            ThreePointArc((-17.65, 22.1), (-19.2, 23.65), (-17.65, 25.2))
            Line((-17.65, 25.2), (-15.65, 25.2))
            ThreePointArc((-15.65, 25.2), (-14.1, 23.65), (-15.65, 22.1))
        make_face()
        with BuildLine():
            Line((-46.65, 22.1), (-48.65, 22.1))
            ThreePointArc((-48.65, 22.1), (-50.2, 23.65), (-48.65, 25.2))
            Line((-48.65, 25.2), (-46.65, 25.2))
            ThreePointArc((-46.65, 25.2), (-45.1, 23.65), (-46.65, 22.1))
        make_face()
    extrude(amount=-CUT_EXTRUDE10_DEPTH, mode=Mode.SUBTRACT)

    # Sketch26 → Cut-Extrude11 (cut)
    with BuildSketch(Plane.ZY.offset(-34).offset(CUT_EXTRUDE11_START)):
        with Locations((25, 62.5)):
            Rectangle(SKETCH26_W, SKETCH26_H)
    extrude(amount=CUT_EXTRUDE11_DEPTH, mode=Mode.SUBTRACT)

    # Sketch28 → Cut-Extrude12 (cut)
    with BuildSketch(Plane(origin=(0, 0, 0), x_dir=(-1, 0, 0), z_dir=(0, 0, -1))):
        with Locations((-19, 34.007303443)):
            Rectangle(SKETCH28_W, SKETCH28_H)
    extrude(amount=-CUT_EXTRUDE12_DEPTH, mode=Mode.SUBTRACT)

    # Sketch29 → Cut-Extrude13 (cut)
    with BuildSketch(Plane(origin=(0, 0, 46.02), x_dir=(-1, 0, 0), z_dir=(0, 0, -1))):
        with Locations((-11, -11)):
            Circle(SKETCH29_R)
        with Locations((-27, -3.5)):
            Circle(SKETCH29_R_2)
        with Locations((-11, 4)):
            Circle(SKETCH29_R)
        with Locations((-43, 4)):
            Circle(SKETCH29_R)
        with Locations((-43, -11)):
            Circle(SKETCH29_R)
    extrude(amount=-CUT_EXTRUDE13_DEPTH, mode=Mode.SUBTRACT)


solid = part_1.part
